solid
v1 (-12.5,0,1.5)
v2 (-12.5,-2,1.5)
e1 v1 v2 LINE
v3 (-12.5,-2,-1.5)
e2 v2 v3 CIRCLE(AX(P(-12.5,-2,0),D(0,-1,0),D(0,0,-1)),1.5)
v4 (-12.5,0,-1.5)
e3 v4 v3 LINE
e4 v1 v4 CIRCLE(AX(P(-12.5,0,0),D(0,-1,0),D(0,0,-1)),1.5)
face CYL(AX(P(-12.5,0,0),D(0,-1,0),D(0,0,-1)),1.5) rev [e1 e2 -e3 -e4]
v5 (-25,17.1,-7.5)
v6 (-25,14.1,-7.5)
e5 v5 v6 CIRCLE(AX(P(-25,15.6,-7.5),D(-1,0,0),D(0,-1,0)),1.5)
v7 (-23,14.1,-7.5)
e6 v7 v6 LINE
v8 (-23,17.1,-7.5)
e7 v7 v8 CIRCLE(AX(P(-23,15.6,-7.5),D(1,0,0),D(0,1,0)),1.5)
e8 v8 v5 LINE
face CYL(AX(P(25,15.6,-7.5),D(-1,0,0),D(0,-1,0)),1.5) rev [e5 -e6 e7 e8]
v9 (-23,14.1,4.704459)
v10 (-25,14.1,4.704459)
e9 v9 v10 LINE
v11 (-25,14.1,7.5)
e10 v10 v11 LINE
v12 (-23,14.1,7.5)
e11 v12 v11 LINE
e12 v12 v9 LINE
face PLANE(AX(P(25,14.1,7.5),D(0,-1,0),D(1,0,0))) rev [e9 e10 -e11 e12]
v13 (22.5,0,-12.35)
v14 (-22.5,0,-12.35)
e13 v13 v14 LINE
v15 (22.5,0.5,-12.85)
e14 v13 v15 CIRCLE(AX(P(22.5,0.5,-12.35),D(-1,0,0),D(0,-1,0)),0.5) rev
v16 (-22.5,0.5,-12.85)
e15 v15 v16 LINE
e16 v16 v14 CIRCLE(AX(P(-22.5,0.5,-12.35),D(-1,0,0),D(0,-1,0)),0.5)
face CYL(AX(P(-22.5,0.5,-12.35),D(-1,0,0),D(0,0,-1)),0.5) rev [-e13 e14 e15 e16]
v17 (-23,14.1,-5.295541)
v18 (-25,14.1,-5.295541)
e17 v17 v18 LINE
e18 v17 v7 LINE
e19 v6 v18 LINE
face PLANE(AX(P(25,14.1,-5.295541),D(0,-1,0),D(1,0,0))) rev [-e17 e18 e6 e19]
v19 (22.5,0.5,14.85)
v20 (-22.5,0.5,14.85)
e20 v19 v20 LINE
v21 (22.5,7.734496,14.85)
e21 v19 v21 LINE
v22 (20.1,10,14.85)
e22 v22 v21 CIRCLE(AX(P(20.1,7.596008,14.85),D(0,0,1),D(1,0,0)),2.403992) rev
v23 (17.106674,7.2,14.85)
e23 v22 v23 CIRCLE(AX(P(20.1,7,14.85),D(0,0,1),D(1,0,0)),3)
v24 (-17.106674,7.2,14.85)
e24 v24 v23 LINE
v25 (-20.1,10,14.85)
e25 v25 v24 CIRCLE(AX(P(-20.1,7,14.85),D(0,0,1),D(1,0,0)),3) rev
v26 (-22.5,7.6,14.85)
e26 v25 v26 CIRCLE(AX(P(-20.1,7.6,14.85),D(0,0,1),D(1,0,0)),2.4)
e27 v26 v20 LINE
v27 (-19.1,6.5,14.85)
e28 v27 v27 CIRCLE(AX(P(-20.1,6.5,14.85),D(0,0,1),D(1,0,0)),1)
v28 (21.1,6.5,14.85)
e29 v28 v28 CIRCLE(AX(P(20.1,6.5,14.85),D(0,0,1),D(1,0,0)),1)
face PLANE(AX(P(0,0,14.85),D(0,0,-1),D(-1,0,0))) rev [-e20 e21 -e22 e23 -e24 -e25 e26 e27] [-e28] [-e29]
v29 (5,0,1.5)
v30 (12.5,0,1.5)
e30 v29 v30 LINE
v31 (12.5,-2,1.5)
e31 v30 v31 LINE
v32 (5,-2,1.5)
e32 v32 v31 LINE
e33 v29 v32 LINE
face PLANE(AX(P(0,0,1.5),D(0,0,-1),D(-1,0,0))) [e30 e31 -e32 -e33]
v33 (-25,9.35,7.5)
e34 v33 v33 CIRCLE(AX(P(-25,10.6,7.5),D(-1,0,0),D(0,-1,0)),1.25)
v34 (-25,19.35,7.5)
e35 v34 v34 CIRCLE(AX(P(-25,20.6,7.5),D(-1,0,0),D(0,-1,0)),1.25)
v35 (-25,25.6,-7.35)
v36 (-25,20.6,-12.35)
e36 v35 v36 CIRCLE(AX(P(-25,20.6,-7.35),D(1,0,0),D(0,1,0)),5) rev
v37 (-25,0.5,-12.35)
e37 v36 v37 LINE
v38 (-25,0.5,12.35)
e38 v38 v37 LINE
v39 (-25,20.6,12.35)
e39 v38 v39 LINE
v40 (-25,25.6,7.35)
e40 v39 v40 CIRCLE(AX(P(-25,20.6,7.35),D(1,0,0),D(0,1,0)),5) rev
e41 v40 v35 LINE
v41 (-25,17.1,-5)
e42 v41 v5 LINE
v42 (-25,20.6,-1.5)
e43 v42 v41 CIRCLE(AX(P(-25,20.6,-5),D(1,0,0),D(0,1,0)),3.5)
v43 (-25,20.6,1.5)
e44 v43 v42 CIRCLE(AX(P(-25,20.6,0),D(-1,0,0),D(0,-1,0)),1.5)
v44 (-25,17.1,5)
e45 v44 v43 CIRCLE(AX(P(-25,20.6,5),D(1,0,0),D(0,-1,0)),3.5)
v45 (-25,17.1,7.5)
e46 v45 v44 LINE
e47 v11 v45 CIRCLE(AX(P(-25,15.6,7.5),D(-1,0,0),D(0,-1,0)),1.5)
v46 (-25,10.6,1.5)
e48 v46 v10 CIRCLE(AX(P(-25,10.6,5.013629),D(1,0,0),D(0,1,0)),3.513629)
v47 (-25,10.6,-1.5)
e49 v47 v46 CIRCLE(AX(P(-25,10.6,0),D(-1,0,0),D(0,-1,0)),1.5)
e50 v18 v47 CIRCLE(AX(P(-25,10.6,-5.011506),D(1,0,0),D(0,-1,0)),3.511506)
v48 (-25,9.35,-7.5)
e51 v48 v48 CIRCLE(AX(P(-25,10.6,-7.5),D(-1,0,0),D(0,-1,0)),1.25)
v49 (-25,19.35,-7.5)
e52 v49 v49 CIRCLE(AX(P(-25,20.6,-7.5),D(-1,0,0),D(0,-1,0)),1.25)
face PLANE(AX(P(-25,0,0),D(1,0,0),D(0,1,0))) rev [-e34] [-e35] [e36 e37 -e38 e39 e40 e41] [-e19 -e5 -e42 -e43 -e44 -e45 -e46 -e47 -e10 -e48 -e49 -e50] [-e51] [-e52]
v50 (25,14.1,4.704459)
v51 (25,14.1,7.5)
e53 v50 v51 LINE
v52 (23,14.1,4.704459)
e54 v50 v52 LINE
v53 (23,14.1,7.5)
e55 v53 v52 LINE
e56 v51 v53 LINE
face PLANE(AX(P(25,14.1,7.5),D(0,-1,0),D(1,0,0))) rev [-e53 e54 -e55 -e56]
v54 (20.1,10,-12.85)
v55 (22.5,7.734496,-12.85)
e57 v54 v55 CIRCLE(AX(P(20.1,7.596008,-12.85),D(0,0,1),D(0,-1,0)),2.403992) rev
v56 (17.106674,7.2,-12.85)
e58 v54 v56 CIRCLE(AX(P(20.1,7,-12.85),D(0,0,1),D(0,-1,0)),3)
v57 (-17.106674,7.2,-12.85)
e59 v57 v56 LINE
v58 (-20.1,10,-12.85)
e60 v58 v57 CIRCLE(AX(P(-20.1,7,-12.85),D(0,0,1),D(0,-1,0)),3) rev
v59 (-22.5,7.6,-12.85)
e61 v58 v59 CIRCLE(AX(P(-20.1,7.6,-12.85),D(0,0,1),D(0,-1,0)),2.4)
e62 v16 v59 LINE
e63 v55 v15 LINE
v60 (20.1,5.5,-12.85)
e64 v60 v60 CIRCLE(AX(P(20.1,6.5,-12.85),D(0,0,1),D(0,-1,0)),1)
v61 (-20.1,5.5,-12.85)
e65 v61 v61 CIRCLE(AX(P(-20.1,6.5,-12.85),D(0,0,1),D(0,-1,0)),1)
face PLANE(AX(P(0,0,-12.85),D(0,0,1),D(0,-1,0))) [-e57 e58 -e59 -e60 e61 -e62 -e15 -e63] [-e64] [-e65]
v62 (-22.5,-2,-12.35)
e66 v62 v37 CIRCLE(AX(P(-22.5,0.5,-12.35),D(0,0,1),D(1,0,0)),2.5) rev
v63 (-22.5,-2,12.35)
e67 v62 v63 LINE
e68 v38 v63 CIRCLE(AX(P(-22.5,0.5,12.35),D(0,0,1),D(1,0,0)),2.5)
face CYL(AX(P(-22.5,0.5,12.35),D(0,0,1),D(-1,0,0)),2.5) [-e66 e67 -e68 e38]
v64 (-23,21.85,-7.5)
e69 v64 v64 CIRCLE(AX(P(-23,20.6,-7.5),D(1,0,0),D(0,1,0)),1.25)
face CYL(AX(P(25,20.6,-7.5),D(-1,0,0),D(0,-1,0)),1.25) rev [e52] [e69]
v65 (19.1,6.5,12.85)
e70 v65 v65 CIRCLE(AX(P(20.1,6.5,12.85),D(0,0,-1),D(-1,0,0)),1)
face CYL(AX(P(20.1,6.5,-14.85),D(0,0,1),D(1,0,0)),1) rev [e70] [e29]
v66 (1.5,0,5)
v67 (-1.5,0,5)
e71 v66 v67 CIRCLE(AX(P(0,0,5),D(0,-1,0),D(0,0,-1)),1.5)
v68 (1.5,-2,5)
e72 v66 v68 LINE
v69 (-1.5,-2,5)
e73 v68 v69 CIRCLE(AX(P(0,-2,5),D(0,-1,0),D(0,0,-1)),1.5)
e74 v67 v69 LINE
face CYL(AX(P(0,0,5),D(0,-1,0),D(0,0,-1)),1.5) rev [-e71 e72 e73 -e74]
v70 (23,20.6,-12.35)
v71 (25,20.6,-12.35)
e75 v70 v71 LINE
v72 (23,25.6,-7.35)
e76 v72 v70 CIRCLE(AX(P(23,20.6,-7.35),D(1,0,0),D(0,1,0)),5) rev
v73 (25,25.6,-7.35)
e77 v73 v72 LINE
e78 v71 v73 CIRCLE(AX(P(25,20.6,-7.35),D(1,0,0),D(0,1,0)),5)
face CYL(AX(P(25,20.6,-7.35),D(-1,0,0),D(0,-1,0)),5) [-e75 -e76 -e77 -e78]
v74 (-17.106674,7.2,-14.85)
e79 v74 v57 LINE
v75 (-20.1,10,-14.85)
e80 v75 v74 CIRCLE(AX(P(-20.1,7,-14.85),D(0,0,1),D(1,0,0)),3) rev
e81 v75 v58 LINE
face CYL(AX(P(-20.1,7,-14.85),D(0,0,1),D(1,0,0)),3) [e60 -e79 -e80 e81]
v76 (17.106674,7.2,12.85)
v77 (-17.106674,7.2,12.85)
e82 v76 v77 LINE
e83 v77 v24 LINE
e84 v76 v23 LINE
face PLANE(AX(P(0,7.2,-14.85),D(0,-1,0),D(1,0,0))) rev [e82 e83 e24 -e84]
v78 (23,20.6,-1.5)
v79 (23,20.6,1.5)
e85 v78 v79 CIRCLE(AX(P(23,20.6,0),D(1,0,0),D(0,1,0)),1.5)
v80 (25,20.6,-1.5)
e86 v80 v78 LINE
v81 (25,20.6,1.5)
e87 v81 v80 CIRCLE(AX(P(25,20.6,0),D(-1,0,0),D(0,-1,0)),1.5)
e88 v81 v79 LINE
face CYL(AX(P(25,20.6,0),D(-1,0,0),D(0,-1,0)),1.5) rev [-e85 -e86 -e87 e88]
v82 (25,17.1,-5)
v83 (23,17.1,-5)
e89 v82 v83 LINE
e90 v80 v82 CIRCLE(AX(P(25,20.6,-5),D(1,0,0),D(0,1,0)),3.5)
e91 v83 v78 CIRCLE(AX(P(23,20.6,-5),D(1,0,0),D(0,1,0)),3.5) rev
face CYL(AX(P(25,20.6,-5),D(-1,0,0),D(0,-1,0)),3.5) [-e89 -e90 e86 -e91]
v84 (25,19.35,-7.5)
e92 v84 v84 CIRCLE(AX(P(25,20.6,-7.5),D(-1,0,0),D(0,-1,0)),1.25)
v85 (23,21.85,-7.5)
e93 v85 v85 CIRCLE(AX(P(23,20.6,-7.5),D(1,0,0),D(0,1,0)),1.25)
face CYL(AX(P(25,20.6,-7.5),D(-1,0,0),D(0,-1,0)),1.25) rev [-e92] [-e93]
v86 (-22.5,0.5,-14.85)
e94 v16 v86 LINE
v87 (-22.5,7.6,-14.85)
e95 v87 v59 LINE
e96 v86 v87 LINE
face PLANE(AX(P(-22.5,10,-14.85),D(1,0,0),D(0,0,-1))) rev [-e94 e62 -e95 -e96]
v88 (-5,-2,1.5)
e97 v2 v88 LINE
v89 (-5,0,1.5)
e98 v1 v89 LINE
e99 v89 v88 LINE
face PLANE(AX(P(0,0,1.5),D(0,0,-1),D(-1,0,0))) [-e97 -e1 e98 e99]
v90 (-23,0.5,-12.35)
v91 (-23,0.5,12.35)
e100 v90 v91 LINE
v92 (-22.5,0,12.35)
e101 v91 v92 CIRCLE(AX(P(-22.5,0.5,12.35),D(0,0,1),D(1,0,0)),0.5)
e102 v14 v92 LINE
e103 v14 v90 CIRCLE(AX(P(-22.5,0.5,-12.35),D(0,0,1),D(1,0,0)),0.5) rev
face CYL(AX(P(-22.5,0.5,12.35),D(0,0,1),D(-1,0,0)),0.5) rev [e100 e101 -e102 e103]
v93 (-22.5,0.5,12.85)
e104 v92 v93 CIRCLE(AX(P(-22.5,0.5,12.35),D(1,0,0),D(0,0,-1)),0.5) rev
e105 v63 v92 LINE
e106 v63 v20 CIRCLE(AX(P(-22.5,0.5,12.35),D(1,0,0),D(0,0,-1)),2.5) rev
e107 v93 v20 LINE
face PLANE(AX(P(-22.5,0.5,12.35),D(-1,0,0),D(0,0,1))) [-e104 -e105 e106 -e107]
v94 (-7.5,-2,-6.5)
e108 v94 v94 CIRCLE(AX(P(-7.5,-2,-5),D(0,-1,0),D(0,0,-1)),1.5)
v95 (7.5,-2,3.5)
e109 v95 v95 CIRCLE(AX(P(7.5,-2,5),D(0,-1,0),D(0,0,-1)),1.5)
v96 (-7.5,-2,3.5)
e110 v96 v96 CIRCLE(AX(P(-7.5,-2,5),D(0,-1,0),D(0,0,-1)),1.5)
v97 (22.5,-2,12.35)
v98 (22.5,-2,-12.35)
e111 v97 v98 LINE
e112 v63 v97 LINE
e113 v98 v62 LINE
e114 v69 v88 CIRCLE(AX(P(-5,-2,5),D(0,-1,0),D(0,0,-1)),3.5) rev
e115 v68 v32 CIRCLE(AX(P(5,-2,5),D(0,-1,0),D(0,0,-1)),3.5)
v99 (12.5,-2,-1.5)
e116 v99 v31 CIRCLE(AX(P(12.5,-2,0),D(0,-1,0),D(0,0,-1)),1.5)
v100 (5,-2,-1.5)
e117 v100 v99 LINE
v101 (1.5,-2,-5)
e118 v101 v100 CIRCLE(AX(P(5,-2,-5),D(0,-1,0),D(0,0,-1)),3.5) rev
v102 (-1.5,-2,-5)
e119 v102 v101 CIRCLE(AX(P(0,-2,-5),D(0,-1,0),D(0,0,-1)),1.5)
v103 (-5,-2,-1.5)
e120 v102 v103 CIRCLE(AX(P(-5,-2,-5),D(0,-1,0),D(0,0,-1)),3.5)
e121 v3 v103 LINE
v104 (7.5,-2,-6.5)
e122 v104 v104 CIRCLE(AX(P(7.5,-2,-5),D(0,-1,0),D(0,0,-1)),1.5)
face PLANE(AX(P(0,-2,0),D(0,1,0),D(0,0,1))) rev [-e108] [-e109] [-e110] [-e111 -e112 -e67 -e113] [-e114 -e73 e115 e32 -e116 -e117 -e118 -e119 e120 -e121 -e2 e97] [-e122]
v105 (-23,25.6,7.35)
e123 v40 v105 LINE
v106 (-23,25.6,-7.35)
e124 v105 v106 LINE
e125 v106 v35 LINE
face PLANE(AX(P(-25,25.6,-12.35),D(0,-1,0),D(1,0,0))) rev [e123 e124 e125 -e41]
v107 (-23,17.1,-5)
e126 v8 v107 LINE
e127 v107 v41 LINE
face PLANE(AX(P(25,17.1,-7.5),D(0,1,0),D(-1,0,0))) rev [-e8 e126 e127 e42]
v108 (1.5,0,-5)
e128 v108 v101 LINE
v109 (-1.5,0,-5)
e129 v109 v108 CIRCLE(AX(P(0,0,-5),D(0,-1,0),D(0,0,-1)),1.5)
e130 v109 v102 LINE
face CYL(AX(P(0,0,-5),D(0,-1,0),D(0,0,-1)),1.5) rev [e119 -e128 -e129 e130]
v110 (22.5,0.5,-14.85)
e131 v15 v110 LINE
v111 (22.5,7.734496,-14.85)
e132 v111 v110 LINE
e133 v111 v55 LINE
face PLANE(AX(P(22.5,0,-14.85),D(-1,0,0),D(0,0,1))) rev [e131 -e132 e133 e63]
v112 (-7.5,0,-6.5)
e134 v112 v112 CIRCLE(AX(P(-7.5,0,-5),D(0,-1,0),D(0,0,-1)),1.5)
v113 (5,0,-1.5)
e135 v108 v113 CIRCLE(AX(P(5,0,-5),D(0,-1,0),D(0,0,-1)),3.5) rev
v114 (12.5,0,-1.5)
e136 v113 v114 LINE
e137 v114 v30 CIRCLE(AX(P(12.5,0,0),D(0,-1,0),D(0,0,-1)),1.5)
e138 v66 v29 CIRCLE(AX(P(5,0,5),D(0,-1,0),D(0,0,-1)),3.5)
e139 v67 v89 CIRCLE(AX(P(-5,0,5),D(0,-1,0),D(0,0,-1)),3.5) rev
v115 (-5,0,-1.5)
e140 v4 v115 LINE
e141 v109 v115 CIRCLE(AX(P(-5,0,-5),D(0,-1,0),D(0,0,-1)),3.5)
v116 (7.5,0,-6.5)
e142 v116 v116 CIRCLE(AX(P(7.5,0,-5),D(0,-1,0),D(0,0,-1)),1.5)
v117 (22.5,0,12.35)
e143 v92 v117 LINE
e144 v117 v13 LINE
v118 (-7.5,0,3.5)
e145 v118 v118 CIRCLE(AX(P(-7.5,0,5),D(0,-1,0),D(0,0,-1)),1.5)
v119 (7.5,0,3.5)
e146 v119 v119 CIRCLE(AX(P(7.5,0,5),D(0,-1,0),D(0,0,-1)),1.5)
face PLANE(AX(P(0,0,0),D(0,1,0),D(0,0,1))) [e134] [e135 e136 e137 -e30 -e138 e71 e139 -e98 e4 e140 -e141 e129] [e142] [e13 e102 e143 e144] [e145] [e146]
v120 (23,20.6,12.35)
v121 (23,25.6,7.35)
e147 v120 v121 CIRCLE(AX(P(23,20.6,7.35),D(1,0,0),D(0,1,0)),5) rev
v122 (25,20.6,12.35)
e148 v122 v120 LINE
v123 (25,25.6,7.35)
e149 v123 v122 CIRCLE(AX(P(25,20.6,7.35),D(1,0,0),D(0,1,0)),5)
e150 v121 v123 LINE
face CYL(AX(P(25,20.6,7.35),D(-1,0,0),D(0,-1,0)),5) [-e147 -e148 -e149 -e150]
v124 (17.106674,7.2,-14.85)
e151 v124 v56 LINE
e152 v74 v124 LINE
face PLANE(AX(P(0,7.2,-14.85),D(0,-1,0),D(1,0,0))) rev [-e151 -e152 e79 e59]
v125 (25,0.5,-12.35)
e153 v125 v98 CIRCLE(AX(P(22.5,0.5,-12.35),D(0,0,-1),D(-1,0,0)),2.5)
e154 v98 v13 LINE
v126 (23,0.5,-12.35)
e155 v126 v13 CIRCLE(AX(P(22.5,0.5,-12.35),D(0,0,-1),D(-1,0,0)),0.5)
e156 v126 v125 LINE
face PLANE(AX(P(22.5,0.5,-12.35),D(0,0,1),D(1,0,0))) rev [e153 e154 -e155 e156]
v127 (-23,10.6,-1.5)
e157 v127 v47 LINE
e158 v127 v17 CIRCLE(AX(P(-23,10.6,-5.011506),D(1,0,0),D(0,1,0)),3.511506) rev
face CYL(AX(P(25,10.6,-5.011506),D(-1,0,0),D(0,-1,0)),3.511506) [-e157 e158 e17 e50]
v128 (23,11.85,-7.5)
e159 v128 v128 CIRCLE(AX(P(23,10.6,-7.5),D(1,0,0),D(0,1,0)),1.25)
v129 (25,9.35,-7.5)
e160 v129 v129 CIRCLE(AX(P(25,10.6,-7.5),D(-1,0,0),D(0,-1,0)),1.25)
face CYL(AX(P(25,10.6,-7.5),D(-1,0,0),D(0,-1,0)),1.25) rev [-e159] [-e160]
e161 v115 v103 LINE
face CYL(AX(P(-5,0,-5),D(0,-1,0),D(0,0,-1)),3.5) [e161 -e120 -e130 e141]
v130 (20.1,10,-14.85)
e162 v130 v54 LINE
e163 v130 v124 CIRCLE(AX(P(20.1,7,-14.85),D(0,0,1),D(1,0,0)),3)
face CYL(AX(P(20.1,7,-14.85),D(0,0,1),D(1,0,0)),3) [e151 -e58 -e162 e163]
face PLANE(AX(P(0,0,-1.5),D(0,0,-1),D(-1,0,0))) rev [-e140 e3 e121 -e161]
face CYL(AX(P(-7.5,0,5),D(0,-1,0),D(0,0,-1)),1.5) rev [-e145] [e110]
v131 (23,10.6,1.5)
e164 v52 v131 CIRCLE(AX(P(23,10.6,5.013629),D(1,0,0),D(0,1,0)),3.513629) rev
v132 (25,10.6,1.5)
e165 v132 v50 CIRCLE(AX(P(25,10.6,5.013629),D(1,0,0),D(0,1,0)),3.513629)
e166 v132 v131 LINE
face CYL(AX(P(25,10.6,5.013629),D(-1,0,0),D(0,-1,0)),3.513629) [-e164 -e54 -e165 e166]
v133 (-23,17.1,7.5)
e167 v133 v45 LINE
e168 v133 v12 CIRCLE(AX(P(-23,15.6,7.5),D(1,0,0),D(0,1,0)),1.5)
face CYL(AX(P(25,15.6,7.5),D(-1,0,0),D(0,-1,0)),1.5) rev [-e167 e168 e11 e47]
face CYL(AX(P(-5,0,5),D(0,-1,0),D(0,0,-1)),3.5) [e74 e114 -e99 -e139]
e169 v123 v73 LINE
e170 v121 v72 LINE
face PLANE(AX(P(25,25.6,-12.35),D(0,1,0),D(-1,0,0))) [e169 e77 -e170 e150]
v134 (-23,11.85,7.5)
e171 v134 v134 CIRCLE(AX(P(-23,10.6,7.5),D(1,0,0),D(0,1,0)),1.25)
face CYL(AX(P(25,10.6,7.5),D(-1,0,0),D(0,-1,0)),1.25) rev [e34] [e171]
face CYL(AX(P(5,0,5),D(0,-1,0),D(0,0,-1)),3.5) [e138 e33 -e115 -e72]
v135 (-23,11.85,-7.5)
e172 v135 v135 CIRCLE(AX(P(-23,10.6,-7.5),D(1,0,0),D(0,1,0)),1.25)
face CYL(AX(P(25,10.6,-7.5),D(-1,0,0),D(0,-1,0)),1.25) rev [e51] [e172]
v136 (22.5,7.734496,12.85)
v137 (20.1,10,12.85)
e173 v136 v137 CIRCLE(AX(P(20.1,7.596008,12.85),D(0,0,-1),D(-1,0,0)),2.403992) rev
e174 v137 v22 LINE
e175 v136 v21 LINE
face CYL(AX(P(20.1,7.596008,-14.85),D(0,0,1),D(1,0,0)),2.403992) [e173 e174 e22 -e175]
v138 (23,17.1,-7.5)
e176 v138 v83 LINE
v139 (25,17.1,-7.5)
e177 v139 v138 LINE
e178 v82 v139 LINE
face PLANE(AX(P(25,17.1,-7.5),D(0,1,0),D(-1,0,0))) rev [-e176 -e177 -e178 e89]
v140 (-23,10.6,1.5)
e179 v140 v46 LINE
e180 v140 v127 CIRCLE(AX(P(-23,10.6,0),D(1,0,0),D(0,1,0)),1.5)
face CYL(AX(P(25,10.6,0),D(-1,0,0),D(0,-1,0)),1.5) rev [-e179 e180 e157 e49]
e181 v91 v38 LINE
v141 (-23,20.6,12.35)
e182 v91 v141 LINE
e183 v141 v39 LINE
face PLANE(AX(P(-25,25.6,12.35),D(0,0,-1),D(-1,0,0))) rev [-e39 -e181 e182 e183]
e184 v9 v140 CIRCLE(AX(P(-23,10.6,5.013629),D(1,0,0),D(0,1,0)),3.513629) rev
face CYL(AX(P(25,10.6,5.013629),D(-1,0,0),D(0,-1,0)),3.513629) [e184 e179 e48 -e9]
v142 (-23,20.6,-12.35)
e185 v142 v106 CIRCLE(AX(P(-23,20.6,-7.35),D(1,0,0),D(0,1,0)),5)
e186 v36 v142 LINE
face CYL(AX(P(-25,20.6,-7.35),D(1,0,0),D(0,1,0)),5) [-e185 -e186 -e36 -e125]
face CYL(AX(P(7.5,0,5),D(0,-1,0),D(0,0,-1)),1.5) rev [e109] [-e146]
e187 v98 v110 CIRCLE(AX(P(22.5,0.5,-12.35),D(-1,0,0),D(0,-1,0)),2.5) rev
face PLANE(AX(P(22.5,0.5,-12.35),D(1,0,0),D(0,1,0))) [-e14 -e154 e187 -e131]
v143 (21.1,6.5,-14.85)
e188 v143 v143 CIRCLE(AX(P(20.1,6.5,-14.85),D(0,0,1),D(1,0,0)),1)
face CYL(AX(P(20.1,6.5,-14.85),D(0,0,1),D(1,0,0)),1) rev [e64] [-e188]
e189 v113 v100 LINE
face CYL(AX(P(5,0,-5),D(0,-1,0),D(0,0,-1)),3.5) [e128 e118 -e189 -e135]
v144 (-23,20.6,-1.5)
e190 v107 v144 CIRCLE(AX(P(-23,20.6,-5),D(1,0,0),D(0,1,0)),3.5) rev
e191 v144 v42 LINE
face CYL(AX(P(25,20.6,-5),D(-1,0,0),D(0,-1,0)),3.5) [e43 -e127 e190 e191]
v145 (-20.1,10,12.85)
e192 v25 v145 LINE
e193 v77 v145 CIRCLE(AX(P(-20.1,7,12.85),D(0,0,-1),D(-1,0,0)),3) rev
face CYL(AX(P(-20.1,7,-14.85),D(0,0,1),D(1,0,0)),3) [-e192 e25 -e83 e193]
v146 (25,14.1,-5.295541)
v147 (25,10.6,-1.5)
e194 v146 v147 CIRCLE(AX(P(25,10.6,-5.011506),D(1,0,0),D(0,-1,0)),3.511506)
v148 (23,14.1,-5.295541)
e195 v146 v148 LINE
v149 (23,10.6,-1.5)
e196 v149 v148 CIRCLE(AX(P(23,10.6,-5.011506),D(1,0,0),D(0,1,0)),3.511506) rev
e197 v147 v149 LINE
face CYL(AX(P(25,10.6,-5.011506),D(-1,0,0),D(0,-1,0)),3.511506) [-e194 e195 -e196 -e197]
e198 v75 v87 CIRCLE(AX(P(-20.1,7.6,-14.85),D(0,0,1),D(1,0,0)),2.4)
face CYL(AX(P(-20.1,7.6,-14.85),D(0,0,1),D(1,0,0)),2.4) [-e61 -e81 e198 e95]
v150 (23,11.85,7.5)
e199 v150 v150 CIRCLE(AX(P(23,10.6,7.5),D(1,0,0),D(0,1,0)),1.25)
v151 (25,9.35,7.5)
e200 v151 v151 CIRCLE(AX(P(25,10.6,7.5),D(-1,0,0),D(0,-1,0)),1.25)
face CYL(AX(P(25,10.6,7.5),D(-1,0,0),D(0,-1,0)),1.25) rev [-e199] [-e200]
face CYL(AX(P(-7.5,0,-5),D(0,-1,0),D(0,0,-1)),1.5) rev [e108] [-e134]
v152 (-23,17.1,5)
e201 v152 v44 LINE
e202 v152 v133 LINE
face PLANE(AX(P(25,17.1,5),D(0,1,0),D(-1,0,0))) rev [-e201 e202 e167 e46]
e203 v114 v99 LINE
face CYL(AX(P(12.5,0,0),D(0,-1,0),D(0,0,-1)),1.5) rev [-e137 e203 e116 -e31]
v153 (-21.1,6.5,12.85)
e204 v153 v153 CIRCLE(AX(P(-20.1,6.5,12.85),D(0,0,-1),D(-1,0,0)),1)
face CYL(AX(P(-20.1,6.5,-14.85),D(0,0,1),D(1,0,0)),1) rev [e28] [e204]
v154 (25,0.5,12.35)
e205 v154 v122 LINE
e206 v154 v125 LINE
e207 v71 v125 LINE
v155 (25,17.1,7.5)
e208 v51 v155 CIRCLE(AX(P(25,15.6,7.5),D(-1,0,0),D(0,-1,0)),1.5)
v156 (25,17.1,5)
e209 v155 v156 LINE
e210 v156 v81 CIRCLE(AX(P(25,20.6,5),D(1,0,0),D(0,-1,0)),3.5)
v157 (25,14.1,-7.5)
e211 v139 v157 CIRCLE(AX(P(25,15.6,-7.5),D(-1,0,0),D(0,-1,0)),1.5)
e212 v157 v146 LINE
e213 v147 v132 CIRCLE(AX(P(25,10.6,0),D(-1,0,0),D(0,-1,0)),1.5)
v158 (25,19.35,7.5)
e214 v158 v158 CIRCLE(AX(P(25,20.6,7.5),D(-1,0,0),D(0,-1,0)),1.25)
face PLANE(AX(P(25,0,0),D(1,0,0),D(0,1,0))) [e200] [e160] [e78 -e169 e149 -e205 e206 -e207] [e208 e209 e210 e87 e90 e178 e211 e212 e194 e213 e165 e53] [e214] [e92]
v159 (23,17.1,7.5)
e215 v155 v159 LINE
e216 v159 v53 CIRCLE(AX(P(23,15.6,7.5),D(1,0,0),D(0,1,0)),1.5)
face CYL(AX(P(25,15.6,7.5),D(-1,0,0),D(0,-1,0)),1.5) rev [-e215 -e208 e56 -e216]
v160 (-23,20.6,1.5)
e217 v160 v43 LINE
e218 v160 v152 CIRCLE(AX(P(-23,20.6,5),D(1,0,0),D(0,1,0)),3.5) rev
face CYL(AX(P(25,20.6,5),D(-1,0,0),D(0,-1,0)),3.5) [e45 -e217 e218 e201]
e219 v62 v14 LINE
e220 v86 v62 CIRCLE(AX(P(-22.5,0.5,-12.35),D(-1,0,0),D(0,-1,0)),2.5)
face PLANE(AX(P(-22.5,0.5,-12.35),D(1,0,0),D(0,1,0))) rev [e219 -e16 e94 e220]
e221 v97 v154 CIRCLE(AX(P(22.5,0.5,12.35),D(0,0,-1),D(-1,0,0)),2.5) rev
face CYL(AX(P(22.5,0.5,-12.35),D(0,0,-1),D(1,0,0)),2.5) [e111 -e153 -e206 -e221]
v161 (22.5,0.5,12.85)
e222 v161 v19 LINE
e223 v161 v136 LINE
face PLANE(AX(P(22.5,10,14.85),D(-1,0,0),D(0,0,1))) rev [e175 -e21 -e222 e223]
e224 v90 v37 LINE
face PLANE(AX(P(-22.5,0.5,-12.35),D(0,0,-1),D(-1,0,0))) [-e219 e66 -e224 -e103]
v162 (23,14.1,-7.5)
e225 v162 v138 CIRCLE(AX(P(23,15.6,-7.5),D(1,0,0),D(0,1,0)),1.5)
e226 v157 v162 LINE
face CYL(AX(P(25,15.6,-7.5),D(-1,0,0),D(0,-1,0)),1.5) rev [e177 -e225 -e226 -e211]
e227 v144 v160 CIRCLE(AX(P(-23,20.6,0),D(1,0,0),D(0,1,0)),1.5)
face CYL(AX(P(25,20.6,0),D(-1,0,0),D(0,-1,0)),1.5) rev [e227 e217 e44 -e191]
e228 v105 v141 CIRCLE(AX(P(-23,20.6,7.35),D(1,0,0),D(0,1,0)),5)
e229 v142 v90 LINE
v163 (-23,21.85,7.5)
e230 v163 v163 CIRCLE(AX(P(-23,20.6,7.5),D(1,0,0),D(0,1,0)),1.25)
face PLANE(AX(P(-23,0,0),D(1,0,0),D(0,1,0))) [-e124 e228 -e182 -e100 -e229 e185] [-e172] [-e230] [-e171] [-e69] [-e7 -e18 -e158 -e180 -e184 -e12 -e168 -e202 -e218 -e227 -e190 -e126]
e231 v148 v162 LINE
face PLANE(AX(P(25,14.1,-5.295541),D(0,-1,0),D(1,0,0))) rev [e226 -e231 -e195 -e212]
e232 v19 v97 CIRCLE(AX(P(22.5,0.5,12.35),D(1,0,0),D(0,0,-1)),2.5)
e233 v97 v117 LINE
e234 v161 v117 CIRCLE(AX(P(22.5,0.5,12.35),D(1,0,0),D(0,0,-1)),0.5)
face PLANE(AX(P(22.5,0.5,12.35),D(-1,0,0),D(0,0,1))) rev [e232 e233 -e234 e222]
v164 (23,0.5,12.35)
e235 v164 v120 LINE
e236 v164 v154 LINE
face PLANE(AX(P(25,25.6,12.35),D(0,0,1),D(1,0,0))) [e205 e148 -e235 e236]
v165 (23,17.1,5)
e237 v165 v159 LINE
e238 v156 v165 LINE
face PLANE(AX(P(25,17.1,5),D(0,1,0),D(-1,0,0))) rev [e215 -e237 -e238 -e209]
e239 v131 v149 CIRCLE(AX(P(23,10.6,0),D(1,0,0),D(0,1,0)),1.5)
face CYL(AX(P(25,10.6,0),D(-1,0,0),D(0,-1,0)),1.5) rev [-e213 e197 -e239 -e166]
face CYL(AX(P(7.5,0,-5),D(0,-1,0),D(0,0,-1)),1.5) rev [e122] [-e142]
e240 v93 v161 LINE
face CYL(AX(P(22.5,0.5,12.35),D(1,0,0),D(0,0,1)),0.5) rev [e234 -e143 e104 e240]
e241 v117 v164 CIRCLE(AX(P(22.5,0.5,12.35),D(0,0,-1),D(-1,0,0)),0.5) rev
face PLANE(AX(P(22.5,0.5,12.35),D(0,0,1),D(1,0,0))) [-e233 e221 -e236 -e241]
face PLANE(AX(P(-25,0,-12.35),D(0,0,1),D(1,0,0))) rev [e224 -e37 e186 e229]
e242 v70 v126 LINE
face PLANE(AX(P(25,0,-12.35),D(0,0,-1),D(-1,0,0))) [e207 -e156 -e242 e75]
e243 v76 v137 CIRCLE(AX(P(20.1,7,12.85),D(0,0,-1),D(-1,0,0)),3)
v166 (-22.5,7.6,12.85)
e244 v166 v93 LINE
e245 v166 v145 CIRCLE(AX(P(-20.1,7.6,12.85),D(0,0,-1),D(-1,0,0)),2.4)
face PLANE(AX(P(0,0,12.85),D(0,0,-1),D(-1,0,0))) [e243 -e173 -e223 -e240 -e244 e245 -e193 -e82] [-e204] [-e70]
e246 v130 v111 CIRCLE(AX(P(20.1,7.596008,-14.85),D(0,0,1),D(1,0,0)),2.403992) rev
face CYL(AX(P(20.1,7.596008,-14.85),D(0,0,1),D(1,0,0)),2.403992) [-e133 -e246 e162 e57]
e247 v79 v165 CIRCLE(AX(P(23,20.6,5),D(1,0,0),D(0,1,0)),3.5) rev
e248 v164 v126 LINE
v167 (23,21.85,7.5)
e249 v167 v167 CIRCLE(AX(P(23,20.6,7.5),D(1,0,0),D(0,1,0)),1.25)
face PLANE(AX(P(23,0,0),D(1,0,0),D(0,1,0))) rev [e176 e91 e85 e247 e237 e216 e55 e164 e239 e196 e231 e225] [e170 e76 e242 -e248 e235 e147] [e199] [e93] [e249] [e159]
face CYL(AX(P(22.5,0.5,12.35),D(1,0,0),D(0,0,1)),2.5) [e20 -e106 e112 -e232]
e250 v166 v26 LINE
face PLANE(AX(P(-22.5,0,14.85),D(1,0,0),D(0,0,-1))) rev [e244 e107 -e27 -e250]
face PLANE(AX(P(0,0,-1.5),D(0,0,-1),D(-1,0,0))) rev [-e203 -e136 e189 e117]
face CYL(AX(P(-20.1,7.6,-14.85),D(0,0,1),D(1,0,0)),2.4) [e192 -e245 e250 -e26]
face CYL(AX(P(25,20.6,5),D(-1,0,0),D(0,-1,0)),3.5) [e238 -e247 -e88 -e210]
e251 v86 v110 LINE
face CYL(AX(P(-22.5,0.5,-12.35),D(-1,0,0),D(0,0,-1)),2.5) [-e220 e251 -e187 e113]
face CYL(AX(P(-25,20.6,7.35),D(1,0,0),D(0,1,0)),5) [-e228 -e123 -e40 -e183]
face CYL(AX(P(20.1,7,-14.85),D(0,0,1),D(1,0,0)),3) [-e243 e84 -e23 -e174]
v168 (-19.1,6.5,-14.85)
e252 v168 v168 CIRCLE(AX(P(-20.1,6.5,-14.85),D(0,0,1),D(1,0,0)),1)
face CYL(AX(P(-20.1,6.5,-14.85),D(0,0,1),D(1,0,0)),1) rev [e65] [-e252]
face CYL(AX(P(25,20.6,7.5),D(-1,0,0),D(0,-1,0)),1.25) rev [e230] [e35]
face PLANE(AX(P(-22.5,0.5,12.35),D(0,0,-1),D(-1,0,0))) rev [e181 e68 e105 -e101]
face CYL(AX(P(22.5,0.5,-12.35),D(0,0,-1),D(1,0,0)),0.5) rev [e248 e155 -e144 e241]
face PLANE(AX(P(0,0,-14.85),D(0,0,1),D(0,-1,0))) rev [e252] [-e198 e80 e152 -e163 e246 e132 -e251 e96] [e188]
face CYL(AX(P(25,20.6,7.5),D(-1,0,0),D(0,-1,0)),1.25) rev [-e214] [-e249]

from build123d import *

# Parameters (mm, degrees)
CROQUIS2_W             = 45
CROQUIS2_H             = 24.7
BRIDA_BASE1_DEPTH      = 2
BRIDA_DE_ARISTA1_DEPTH = 24.7
BRIDA_DE_ARISTA2_DEPTH = 24.7
BRIDA_DE_ARISTA3_DEPTH = 45
BRIDA_DE_ARISTA4_DEPTH = 45
CROQUIS34_R            = 1.25
CORTAR_EXTRUIR2_DEPTH  = 59.102345047
REDONDEO2_R            = 5
CROQUIS35_R            = 1
CORTAR_EXTRUIR3_DEPTH  = 47.502150488
CROQUIS36_R            = 1.5
CORTAR_EXTRUIR4_DEPTH  = 10


# Sheet-metal steps are written as plain solids
with BuildPart() as part:
    # Croquis2 → Brida base1 (new body)
    with BuildSketch(Plane(origin=(0, 0, 0), x_dir=(1, 0, 0), z_dir=(0, 1, 0))):
        Rectangle(CROQUIS2_W, CROQUIS2_H)
    extrude(amount=-BRIDA_BASE1_DEPTH)

    # Brida de arista1 section (across the edge) → Brida de arista1 (add)
    with BuildSketch(Plane(origin=(23, 0, 12.35), x_dir=(-1, 0, 0), z_dir=(0, 0, -1))):
        with BuildLine():
            Line((-2, 0.5), (-2, 25.6))
            Line((-2, 25.6), (0, 25.6))
            Line((0, 25.6), (0, 0.5))
            ThreePointArc((0, 0.5), (0.146446609, 0.146446609), (0.5, 0))
            Line((0.5, 0), (0.5, -2))
            ThreePointArc((0.5, -2), (-1.267766953, -1.267766953), (-2, 0.5))
        make_face()
    extrude(amount=BRIDA_DE_ARISTA1_DEPTH)

    # Brida de arista2 section (across the edge) → Brida de arista2 (add)
    with BuildSketch(Plane(origin=(-23, 0, -12.35), x_dir=(1, 0, 0), z_dir=(0, 0, 1))):
        with BuildLine():
            Line((-2, 0.5), (-2, 25.6))
            Line((-2, 25.6), (0, 25.6))
            Line((0, 25.6), (0, 0.5))
            ThreePointArc((0, 0.5), (0.146446609, 0.146446609), (0.5, 0))
            Line((0.5, 0), (0.5, -2))
            ThreePointArc((0.5, -2), (-1.267766953, -1.267766953), (-2, 0.5))
        make_face()
    extrude(amount=BRIDA_DE_ARISTA2_DEPTH)

    # Brida de arista3 section (across the edge) → Brida de arista3 (add)
    with BuildSketch(Plane(origin=(22.5, 0, -12.85), x_dir=(0, 0, 1), z_dir=(-1, 0, 0))):
        with BuildLine():
            Line((-2, 0.5), (-2, 10))
            Line((-2, 10), (0, 10))
            Line((0, 10), (0, 0.5))
            ThreePointArc((0, 0.5), (0.146446609, 0.146446609), (0.5, 0))
            Line((0.5, 0), (0.5, -2))
            ThreePointArc((0.5, -2), (-1.267766953, -1.267766953), (-2, 0.5))
        make_face()
    extrude(amount=BRIDA_DE_ARISTA3_DEPTH)

    # Brida de arista4 section (across the edge) → Brida de arista4 (add)
    with BuildSketch(Plane(origin=(-22.5, 0, 12.85), x_dir=(0, 0, -1), z_dir=(1, 0, 0))):
        with BuildLine():
            Line((-2, 0.5), (-2, 10))
            Line((-2, 10), (0, 10))
            Line((0, 10), (0, 0.5))
            ThreePointArc((0, 0.5), (0.146446609, 0.146446609), (0.5, 0))
            Line((0.5, 0), (0.5, -2))
            ThreePointArc((0.5, -2), (-1.267766953, -1.267766953), (-2, 0.5))
        make_face()
    extrude(amount=BRIDA_DE_ARISTA4_DEPTH)

    # Croquis34 → Cortar-Extruir2 (cut, through all)
    with BuildSketch(Plane.ZY.offset(25)):
        with Locations(Location((-7.5, 20.6, 0), (0, 0, 270))):
            Circle(CROQUIS34_R)
        with Locations(Location((7.5, 20.6, 0), (0, 0, 270))):
            Circle(CROQUIS34_R)
        with Locations(Location((7.5, 10.6, 0), (0, 0, 270))):
            Circle(CROQUIS34_R)
        with Locations(Location((-7.5, 10.6, 0), (0, 0, 270))):
            Circle(CROQUIS34_R)
        with BuildLine():
            Line((-7.5, 17.1), (-5, 17.1))
            ThreePointArc((-5, 17.1), (-2.525126266, 18.125126266), (-1.5, 20.6))
            ThreePointArc((-1.5, 20.6), (0, 22.1), (1.5, 20.6))
            ThreePointArc((1.5, 20.6), (2.525126266, 18.125126266), (5, 17.1))
            Line((5, 17.1), (7.5, 17.1))
            ThreePointArc((7.5, 17.1), (9, 15.6), (7.5, 14.1))
            Line((7.5, 14.1), (4.704458788, 14.1))
            ThreePointArc((4.704458788, 14.1), (2.422114194, 12.972686037), (1.5, 10.6))
            ThreePointArc((1.5, 10.6), (0, 9.1), (-1.5, 10.6))
            ThreePointArc((-1.5, 10.6), (-2.631035123, 13.181478893), (-5.295541212, 14.1))
            Line((-5.295541212, 14.1), (-7.5, 14.1))
            ThreePointArc((-7.5, 14.1), (-9, 15.6), (-7.5, 17.1))
        make_face()
    extrude(amount=-CORTAR_EXTRUIR2_DEPTH, mode=Mode.SUBTRACT)

    # Redondeo2
    redondeo2_edges = [part.edges().sort_by_distance(p)[0] for p in [
        (24, 25.6, 12.35),
        (24, 25.6, -12.35),
        (-24, 25.6, -12.35),
        (-24, 25.6, 12.35),
    ]]
    fillet(redondeo2_edges, radius=REDONDEO2_R)

    # Croquis35 → Cortar-Extruir3 (cut, through all)
    with BuildSketch(Plane.XY.offset(14.85)):
        with BuildLine():
            ThreePointArc((-22.5, 7.6), (-21.797056275, 9.297056275), (-20.1, 10))
            Line((-20.1, 10), (-22.5, 10))
            Line((-22.5, 10), (-22.5, 7.6))
        make_face()
        with BuildLine():
            ThreePointArc((-20.1, 10), (-18.050609847, 9.19089023), (-17.106674091, 7.2))
            Line((-17.106674091, 7.2), (17.106674091, 7.2))
            ThreePointArc((17.106674091, 7.2), (18.050609847, 9.19089023), (20.1, 10))
            Line((20.1, 10), (-20.1, 10))
        make_face()
        with BuildLine():
            Line((22.5, 10), (20.1, 10))
            ThreePointArc((20.1, 10), (21.750190132, 9.344164297), (22.5, 7.734495665))
            Line((22.5, 7.734495665), (22.5, 10))
        make_face()
        with Locations((-20.1, 6.5)):
            Circle(CROQUIS35_R)
        with Locations((20.1, 6.5)):
            Circle(CROQUIS35_R)
    extrude(amount=-CORTAR_EXTRUIR3_DEPTH, mode=Mode.SUBTRACT)

    # Croquis36 → Cortar-Extruir4 (cut)
    with BuildSketch(Plane.XZ.offset(2)):
        with BuildLine():
            Line((-5, 1.5), (-12.5, 1.5))
            ThreePointArc((-12.5, 1.5), (-14, 0), (-12.5, -1.5))
            Line((-12.5, -1.5), (-5, -1.5))
            ThreePointArc((-5, -1.5), (-2.525126266, -2.525126266), (-1.5, -5))
            ThreePointArc((-1.5, -5), (0, -6.5), (1.5, -5))
            ThreePointArc((1.5, -5), (2.525126266, -2.525126266), (5, -1.5))
            Line((5, -1.5), (12.5, -1.5))
            ThreePointArc((12.5, -1.5), (14, 0), (12.5, 1.5))
            Line((12.5, 1.5), (5, 1.5))
            ThreePointArc((5, 1.5), (2.525126266, 2.525126266), (1.5, 5))
            ThreePointArc((1.5, 5), (0, 6.5), (-1.5, 5))
            ThreePointArc((-1.5, 5), (-2.525126266, 2.525126266), (-5, 1.5))
        make_face()
        with Locations(Location((-7.5, 5, 0), (0, 0, 270))):
            Circle(CROQUIS36_R)
        with Locations(Location((7.5, 5, 0), (0, 0, 270))):
            Circle(CROQUIS36_R)
        with Locations(Location((7.5, -5, 0), (0, 0, 270))):
            Circle(CROQUIS36_R)
        with Locations(Location((-7.5, -5, 0), (0, 0, 270))):
            Circle(CROQUIS36_R)
    extrude(amount=-CORTAR_EXTRUIR4_DEPTH, mode=Mode.SUBTRACT)


solid = part.part
